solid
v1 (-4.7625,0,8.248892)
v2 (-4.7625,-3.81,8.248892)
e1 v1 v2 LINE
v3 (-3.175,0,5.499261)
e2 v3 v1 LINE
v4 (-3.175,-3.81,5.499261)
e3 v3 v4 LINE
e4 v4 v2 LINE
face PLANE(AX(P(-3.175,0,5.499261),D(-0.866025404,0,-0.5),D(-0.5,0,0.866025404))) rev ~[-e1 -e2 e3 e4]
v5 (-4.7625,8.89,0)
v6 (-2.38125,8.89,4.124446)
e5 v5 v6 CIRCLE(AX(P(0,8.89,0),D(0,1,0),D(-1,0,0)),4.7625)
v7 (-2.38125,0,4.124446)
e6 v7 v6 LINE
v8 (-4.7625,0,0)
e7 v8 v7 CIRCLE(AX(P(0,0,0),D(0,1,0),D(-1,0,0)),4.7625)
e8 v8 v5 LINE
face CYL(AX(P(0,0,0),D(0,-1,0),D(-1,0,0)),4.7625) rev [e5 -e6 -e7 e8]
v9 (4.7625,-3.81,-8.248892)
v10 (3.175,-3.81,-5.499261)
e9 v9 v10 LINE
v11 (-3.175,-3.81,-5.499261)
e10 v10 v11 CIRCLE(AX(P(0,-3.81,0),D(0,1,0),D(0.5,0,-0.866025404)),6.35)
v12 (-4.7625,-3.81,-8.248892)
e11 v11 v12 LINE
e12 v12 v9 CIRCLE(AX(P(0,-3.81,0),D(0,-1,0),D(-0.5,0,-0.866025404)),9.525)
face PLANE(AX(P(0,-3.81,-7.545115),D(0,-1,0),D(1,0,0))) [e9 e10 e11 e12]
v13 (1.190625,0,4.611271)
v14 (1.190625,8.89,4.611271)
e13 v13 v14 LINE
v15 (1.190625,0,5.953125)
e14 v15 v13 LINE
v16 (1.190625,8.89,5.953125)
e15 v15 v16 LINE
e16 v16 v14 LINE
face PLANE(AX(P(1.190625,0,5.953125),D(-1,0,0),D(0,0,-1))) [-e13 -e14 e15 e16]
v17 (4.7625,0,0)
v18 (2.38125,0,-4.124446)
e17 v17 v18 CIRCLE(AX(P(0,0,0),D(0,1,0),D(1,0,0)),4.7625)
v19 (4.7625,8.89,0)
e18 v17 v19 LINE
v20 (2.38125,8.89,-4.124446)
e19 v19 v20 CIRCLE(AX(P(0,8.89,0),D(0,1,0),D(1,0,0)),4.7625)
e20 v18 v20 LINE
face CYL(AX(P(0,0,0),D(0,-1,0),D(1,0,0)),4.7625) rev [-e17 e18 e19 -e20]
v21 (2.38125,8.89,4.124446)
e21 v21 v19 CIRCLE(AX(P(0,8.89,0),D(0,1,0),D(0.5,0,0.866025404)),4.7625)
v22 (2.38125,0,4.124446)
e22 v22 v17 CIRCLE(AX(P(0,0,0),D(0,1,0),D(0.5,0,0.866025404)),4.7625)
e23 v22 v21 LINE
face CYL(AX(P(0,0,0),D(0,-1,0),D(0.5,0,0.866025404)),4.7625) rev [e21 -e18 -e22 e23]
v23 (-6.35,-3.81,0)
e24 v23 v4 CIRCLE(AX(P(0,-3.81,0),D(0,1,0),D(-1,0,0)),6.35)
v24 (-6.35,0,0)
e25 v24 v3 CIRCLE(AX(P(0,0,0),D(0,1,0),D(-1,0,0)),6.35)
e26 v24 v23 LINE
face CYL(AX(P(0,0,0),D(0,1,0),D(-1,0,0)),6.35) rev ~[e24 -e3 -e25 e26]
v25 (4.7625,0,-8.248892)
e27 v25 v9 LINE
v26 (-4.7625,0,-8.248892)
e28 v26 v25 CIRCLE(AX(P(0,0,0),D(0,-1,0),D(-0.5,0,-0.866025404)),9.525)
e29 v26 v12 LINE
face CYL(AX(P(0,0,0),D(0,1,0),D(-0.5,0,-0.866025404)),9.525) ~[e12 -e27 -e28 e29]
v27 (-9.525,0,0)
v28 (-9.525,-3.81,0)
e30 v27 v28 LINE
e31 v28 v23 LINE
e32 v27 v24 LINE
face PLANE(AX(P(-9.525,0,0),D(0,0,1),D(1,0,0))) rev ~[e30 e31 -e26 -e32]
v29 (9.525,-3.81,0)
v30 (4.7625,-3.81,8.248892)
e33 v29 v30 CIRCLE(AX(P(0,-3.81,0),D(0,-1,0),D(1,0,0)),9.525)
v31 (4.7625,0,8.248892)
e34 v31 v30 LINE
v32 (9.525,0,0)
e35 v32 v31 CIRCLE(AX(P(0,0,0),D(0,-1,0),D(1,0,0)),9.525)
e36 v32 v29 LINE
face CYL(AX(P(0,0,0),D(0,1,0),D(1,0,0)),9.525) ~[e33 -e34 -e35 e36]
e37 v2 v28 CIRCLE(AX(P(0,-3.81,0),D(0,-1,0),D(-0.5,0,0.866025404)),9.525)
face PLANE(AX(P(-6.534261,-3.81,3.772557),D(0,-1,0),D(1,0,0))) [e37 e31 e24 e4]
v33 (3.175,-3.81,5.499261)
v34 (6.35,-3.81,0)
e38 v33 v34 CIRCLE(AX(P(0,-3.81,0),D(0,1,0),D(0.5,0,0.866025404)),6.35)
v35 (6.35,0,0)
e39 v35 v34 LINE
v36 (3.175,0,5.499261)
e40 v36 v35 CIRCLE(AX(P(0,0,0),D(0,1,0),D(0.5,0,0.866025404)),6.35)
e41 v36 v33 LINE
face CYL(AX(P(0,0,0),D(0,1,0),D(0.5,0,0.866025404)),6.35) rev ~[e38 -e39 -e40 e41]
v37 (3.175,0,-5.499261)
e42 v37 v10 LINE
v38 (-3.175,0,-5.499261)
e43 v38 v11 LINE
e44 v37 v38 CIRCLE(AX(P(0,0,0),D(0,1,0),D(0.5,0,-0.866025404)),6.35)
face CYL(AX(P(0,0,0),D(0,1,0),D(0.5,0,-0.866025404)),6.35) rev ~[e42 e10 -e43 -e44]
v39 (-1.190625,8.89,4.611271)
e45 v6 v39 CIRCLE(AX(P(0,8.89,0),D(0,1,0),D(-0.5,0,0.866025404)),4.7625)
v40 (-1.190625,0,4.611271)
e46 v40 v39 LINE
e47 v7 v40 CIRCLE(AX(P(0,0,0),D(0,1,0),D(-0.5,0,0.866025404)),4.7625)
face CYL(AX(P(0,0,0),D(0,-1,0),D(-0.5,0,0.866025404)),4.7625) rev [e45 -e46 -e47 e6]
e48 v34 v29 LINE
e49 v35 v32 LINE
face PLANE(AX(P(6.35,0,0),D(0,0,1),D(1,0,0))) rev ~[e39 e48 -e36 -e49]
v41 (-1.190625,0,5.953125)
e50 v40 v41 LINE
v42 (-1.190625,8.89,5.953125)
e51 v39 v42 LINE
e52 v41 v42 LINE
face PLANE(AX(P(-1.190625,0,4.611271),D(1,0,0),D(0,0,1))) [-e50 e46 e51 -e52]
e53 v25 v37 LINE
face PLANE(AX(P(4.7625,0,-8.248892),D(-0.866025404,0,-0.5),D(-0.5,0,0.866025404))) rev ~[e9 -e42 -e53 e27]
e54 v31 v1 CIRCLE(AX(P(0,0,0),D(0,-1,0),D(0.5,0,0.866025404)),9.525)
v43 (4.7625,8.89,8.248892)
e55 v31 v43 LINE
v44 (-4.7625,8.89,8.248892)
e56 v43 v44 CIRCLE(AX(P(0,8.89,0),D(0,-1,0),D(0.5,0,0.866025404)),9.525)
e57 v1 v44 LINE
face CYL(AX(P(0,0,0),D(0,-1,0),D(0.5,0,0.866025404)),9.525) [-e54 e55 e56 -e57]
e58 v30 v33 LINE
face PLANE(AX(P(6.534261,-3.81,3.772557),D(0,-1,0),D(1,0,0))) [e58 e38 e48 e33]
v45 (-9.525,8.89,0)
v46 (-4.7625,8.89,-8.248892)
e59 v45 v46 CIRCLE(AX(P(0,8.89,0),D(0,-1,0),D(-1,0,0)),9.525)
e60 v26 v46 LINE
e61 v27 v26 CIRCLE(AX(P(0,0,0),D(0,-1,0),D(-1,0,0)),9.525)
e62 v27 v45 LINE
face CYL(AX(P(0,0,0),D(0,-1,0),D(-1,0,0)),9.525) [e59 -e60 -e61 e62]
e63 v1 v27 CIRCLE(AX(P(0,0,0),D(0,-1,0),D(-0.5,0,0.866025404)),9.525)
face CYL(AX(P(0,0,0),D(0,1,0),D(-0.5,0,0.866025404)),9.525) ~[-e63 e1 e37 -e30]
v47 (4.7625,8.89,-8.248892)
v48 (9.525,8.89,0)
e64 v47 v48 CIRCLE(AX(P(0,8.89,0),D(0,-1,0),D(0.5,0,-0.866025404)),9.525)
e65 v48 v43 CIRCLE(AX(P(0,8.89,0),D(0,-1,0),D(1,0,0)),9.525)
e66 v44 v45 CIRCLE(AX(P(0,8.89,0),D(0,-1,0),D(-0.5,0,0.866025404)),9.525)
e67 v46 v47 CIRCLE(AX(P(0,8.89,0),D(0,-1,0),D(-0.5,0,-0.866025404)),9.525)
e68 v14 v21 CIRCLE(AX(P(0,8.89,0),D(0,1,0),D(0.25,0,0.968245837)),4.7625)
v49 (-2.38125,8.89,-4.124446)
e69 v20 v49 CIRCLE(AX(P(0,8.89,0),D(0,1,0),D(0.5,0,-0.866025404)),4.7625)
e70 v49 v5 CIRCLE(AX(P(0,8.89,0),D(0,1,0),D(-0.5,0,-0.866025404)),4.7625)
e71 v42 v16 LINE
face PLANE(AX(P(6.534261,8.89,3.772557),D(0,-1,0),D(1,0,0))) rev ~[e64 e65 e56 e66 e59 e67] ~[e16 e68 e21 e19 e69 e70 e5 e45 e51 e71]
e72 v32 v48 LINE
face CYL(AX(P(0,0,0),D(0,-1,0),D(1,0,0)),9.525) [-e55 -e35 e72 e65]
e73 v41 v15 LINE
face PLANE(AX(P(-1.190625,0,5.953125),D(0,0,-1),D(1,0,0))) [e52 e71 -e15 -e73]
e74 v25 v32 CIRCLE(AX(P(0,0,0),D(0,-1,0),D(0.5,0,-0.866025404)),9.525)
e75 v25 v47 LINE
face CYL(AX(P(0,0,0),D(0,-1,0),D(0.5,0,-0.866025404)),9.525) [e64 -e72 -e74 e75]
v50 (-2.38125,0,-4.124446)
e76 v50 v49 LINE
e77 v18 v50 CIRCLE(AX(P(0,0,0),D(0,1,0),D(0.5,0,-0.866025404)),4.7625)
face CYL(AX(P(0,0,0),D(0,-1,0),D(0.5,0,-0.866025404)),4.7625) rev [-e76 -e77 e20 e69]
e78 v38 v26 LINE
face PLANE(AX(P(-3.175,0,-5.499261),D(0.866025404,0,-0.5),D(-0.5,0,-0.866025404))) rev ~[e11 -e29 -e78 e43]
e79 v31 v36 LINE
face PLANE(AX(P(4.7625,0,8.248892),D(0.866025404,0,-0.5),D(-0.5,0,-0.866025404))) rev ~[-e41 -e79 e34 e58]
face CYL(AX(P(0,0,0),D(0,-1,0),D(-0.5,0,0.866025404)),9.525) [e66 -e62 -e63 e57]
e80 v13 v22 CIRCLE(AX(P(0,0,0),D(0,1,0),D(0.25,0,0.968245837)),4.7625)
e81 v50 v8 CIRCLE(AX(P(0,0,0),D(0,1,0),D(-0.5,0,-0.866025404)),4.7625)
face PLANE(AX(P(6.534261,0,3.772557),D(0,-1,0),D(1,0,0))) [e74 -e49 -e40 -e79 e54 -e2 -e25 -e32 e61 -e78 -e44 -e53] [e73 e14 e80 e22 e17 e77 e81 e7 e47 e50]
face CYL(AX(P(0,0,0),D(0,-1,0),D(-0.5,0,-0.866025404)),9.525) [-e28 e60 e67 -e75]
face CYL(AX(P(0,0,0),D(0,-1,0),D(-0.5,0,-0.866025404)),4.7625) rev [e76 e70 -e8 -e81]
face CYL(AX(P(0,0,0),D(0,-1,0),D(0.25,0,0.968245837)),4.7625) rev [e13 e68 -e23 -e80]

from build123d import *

# Parameters (mm, degrees)
F1_DEPTH = 8.89
F2_DEPTH = 3.81


with BuildPart() as f1:
    # F0 (on Front) → F1 (new body)
    with BuildSketch(Plane.XZ):
        with BuildLine():
            Line((6.35, 0), (9.525, 0))
            ThreePointArc((9.525, 0), (8.248891971, 4.7625), (4.7625, 8.248891971))
            Line((4.7625, 8.248891971), (3.175, 5.499261314))
            ThreePointArc((3.175, 5.499261314), (5.499261314, 3.175), (6.35, 0))
        make_face()
        with BuildLine():
            Line((3.175, 5.499261314), (4.7625, 8.248891971))
            ThreePointArc((4.7625, 8.248891971), (0, 9.525), (-4.7625, 8.248891971))
            Line((-4.7625, 8.248891971), (-3.175, 5.499261314))
            ThreePointArc((-3.175, 5.499261314), (0, 6.35), (3.175, 5.499261314))
        make_face()
        with BuildLine():
            Line((4.7625, 0), (6.35, 0))
            ThreePointArc((6.35, 0), (5.499261314, 3.175), (3.175, 5.499261314))
            Line((3.175, 5.499261314), (2.38125, 4.1244459855))
            ThreePointArc((2.38125, 4.1244459855), (4.1244459855, 2.38125), (4.7625, 0))
        make_face()
        with BuildLine():
            Line((2.38125, 4.1244459855), (3.175, 5.499261314))
            ThreePointArc((3.175, 5.499261314), (0, 6.35), (-3.175, 5.499261314))
            Line((-3.175, 5.499261314), (-2.38125, 4.1244459855))
            ThreePointArc((-2.38125, 4.1244459855), (-1.8024489876, 4.4082404536), (-1.190625, 4.6112707966))
            Line((-1.190625, 4.6112707966), (-1.190625, 5.953125))
            Line((-1.190625, 5.953125), (1.190625, 5.953125))
            Line((1.190625, 5.953125), (1.190625, 4.6112707966))
            ThreePointArc((1.190625, 4.6112707966), (1.8024489876, 4.4082404536), (2.38125, 4.1244459855))
        make_face()
        with BuildLine():
            ThreePointArc((4.7625, -8.248891971), (8.248891971, -4.7625), (9.525, 0))
            Line((9.525, 0), (6.35, 0))
            ThreePointArc((6.35, 0), (5.499261314, -3.175), (3.175, -5.499261314))
            Line((3.175, -5.499261314), (4.7625, -8.248891971))
        make_face()
        with BuildLine():
            Line((-2.38125, 4.1244459855), (-3.175, 5.499261314))
            ThreePointArc((-3.175, 5.499261314), (-5.499261314, 3.175), (-6.35, 0))
            Line((-6.35, 0), (-4.7625, 0))
            ThreePointArc((-4.7625, 0), (-4.1244459855, 2.38125), (-2.38125, 4.1244459855))
        make_face()
        with BuildLine():
            ThreePointArc((-6.35, 0), (-5.499261314, -3.175), (-3.175, -5.499261314))
            Line((-3.175, -5.499261314), (-2.38125, -4.1244459855))
            ThreePointArc((-2.38125, -4.1244459855), (-4.1244459855, -2.38125), (-4.7625, 0))
            Line((-4.7625, 0), (-6.35, 0))
        make_face()
        with BuildLine():
            ThreePointArc((-9.525, 0), (-8.248891971, -4.7625), (-4.7625, -8.248891971))
            Line((-4.7625, -8.248891971), (-3.175, -5.499261314))
            ThreePointArc((-3.175, -5.499261314), (-5.499261314, -3.175), (-6.35, 0))
            Line((-6.35, 0), (-9.525, 0))
        make_face()
        with BuildLine():
            ThreePointArc((-4.7625, -8.248891971), (0, -9.525), (4.7625, -8.248891971))
            Line((4.7625, -8.248891971), (3.175, -5.499261314))
            ThreePointArc((3.175, -5.499261314), (0, -6.35), (-3.175, -5.499261314))
            Line((-3.175, -5.499261314), (-4.7625, -8.248891971))
        make_face()
        with BuildLine():
            ThreePointArc((-3.175, -5.499261314), (0, -6.35), (3.175, -5.499261314))
            Line((3.175, -5.499261314), (2.38125, -4.1244459855))
            ThreePointArc((2.38125, -4.1244459855), (0, -4.7625), (-2.38125, -4.1244459855))
            Line((-2.38125, -4.1244459855), (-3.175, -5.499261314))
        make_face()
        with BuildLine():
            ThreePointArc((3.175, -5.499261314), (5.499261314, -3.175), (6.35, 0))
            Line((6.35, 0), (4.7625, 0))
            ThreePointArc((4.7625, 0), (4.1244459855, -2.38125), (2.38125, -4.1244459855))
            Line((2.38125, -4.1244459855), (3.175, -5.499261314))
        make_face()
        with BuildLine():
            Line((-3.175, 5.499261314), (-4.7625, 8.248891971))
            ThreePointArc((-4.7625, 8.248891971), (-8.248891971, 4.7625), (-9.525, 0))
            Line((-9.525, 0), (-6.35, 0))
            ThreePointArc((-6.35, 0), (-5.499261314, 3.175), (-3.175, 5.499261314))
        make_face()
    extrude(amount=-F1_DEPTH)

    # F0 (on Front) → F2 (join)
    with BuildSketch(Plane.XZ):
        with BuildLine():
            Line((6.35, 0), (9.525, 0))
            ThreePointArc((9.525, 0), (8.248891971, 4.7625), (4.7625, 8.248891971))
            Line((4.7625, 8.248891971), (3.175, 5.499261314))
            ThreePointArc((3.175, 5.499261314), (5.499261314, 3.175), (6.35, 0))
        make_face()
        with BuildLine():
            ThreePointArc((-4.7625, -8.248891971), (0, -9.525), (4.7625, -8.248891971))
            Line((4.7625, -8.248891971), (3.175, -5.499261314))
            ThreePointArc((3.175, -5.499261314), (0, -6.35), (-3.175, -5.499261314))
            Line((-3.175, -5.499261314), (-4.7625, -8.248891971))
        make_face()
        with BuildLine():
            Line((-3.175, 5.499261314), (-4.7625, 8.248891971))
            ThreePointArc((-4.7625, 8.248891971), (-8.248891971, 4.7625), (-9.525, 0))
            Line((-9.525, 0), (-6.35, 0))
            ThreePointArc((-6.35, 0), (-5.499261314, 3.175), (-3.175, 5.499261314))
        make_face()
    extrude(amount=F2_DEPTH)


solid = f1.part
